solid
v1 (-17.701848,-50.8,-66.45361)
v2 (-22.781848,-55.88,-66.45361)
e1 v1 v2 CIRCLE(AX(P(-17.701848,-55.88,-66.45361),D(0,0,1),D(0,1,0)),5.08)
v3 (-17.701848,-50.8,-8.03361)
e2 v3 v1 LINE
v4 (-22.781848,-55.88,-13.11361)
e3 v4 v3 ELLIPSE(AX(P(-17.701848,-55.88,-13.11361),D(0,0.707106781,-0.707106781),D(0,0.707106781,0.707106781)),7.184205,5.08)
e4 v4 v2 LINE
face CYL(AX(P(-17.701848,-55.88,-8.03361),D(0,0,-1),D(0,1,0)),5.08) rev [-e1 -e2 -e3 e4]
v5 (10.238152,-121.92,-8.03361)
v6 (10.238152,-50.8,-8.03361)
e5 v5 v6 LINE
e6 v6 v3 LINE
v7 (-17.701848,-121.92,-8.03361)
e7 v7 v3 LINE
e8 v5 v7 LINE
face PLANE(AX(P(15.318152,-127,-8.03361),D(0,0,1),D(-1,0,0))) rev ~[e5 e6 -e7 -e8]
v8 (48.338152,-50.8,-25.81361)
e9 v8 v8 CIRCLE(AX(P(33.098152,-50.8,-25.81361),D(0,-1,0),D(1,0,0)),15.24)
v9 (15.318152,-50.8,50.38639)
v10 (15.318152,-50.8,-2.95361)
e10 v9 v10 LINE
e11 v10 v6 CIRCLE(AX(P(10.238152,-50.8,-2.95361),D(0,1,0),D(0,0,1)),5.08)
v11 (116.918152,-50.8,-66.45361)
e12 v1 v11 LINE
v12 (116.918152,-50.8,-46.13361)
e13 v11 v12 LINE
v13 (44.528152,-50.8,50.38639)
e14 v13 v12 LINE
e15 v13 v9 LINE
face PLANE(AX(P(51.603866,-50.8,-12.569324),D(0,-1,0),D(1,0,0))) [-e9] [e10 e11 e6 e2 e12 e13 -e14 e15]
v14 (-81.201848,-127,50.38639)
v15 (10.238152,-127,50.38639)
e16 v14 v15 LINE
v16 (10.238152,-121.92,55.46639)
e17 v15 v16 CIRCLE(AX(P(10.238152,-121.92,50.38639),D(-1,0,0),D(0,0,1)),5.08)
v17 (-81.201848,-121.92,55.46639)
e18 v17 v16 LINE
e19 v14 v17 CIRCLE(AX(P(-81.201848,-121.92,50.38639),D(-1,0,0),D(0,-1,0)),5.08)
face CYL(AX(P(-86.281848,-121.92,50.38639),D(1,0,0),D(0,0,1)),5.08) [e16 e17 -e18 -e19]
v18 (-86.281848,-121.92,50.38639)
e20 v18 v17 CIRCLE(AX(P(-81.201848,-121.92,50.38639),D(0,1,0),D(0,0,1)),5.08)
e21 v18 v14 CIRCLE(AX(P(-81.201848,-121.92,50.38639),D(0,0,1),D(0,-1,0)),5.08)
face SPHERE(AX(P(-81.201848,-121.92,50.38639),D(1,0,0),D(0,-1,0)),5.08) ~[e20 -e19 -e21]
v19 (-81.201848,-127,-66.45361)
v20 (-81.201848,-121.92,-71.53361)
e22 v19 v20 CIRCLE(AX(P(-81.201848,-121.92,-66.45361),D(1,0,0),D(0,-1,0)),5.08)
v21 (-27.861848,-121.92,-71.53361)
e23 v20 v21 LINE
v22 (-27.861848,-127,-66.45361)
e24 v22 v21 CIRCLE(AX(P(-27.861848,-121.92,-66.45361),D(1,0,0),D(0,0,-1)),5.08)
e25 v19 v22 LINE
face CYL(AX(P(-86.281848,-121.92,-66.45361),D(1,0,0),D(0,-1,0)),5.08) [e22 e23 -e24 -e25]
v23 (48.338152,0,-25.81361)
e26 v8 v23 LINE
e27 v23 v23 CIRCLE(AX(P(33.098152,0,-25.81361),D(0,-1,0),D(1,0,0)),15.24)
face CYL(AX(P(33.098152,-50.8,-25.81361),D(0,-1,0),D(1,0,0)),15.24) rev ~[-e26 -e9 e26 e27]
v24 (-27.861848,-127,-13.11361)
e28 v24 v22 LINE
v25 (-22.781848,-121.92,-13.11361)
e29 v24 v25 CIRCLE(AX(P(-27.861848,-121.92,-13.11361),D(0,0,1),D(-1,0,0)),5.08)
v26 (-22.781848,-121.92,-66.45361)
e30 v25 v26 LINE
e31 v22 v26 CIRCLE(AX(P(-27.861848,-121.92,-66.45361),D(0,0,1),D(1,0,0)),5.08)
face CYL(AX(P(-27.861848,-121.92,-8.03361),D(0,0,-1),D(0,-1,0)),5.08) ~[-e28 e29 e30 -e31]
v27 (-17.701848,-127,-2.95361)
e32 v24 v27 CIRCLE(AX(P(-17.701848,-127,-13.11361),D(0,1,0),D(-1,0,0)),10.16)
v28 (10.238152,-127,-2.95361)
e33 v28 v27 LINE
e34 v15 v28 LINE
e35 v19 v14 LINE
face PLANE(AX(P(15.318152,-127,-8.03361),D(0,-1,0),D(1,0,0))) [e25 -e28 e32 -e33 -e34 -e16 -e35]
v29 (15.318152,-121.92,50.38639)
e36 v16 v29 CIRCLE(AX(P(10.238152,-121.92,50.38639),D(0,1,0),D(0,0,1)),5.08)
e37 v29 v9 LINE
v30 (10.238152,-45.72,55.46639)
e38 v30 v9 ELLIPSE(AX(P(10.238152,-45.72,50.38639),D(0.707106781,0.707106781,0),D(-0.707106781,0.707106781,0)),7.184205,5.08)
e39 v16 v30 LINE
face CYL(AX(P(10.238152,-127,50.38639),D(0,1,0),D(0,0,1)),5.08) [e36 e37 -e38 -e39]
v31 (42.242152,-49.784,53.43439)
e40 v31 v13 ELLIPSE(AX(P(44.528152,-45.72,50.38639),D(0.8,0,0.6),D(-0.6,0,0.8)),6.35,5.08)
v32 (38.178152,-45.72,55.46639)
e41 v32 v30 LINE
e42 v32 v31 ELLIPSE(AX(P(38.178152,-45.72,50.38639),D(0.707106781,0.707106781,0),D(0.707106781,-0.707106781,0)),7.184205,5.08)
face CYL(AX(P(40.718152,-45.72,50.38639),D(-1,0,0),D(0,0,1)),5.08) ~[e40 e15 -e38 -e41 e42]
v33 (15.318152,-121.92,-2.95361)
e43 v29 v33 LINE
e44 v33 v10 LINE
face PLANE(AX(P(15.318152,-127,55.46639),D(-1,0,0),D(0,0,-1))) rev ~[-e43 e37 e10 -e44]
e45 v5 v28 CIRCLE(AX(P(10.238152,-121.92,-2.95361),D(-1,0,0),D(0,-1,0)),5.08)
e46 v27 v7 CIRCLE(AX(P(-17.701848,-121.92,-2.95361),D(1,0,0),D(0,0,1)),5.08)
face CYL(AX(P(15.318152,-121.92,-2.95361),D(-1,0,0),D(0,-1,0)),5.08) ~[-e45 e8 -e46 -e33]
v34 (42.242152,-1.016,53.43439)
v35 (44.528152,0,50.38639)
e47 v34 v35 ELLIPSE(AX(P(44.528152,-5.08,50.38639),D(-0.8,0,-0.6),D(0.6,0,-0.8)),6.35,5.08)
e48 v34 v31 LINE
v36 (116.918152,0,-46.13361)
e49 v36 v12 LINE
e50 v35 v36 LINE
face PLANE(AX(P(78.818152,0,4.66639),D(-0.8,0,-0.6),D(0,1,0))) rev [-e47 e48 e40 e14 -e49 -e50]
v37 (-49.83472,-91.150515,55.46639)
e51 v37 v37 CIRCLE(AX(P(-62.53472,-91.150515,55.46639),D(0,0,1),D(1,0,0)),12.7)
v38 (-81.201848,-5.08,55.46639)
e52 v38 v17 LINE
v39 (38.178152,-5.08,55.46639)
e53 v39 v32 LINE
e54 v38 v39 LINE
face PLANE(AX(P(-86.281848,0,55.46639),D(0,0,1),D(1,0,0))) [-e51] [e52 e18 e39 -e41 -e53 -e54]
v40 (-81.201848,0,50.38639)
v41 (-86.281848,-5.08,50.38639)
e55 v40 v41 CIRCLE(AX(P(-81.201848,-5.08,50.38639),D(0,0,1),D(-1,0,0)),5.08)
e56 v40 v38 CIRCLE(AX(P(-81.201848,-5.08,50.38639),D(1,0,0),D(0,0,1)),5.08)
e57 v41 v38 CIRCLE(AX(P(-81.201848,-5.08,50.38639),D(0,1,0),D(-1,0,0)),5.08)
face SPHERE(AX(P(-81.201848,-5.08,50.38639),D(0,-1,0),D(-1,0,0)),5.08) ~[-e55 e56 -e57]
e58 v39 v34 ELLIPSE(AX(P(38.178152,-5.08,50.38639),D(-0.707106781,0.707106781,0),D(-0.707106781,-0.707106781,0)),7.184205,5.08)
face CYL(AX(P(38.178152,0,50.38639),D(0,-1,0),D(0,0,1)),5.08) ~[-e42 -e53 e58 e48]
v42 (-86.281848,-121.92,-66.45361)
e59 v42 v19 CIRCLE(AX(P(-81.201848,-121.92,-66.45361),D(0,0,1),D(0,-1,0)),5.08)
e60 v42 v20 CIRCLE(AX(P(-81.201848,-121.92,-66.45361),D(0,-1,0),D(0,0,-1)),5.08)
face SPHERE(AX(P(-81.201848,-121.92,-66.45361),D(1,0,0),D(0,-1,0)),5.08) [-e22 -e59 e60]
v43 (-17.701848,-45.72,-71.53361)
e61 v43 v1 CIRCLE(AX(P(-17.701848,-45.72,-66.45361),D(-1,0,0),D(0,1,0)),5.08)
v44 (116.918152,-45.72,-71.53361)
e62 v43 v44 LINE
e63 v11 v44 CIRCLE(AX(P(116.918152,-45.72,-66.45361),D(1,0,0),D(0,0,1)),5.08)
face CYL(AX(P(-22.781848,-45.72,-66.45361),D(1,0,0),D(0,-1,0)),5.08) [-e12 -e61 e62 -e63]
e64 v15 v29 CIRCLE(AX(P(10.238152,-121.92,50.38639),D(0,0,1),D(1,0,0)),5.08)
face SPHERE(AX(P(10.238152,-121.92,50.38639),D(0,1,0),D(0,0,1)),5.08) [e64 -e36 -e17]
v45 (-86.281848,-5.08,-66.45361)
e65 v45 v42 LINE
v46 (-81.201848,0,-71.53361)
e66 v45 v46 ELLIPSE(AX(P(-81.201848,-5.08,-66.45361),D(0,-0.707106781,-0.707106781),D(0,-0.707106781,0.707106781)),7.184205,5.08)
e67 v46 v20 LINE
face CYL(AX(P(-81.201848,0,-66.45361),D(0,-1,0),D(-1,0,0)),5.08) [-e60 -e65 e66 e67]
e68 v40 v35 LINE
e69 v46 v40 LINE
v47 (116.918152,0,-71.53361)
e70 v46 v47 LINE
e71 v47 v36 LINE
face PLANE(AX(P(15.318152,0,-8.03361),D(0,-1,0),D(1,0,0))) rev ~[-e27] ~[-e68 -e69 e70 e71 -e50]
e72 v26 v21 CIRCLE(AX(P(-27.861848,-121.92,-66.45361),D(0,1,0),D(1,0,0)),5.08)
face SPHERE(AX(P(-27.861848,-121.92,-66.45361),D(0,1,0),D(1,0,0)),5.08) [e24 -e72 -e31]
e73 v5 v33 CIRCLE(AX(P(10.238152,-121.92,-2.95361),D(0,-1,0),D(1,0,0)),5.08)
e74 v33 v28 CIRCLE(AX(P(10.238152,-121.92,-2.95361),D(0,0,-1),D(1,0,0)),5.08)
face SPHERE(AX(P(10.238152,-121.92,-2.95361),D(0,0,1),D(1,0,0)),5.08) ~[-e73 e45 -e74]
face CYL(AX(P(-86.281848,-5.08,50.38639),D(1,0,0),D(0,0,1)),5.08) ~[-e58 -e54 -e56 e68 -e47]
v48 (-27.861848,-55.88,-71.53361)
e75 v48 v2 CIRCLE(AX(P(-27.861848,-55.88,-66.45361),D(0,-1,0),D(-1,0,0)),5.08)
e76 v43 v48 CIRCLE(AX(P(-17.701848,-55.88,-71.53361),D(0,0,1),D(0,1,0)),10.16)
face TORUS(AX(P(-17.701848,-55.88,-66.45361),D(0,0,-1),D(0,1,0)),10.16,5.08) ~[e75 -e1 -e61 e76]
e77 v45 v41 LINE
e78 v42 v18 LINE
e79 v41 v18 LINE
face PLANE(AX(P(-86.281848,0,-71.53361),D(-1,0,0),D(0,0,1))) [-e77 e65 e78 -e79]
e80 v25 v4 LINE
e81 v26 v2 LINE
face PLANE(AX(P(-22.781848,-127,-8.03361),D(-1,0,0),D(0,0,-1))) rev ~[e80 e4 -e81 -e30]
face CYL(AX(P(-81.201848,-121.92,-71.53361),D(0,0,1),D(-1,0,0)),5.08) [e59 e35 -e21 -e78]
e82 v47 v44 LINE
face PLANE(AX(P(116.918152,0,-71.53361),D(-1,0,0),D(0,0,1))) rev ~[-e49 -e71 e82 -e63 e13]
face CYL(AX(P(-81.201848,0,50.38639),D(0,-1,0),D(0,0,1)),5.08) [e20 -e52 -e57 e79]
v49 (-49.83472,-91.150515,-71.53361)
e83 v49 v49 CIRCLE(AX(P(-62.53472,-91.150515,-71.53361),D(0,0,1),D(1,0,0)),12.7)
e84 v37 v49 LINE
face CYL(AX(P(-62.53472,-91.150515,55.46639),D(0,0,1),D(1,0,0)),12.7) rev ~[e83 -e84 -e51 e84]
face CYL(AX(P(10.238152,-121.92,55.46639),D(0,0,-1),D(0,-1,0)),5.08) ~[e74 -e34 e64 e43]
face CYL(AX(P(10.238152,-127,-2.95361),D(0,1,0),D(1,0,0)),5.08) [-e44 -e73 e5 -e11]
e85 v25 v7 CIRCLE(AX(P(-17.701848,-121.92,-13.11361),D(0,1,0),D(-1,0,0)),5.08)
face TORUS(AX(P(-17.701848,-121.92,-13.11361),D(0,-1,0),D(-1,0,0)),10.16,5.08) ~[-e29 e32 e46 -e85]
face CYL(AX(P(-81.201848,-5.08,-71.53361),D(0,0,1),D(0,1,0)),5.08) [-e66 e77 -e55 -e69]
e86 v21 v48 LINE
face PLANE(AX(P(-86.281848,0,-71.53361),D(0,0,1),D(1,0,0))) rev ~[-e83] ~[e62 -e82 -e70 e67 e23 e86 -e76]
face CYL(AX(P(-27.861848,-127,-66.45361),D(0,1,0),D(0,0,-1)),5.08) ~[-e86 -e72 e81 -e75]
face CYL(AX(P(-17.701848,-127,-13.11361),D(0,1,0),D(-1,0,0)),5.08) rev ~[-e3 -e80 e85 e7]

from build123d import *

# Parameters (mm, degrees)
F0_W     = 203.2
F0_H     = 127
F1_DEPTH = 127
F3_DEPTH = 76.2
F4_SIZE2 = 101.6
F4_SIZE  = 76.2
F5_R     = 5.08
F6_R     = 15.24
F7_DEPTH = 50.8
F8_R     = 12.7
F9_DEPTH = 127


with BuildPart() as f1:
    # F0 (on Front) → F1 (new body)
    with BuildSketch(Plane.XZ):
        with Locations((15.3181515634, -8.0336100439)):
            Rectangle(F0_W, F0_H)
    extrude(amount=F1_DEPTH)

    # F2 (on face) → F3 (cut)
    with BuildSketch(Plane.XZ.offset(127)):
        Polygon((-22.7818484366, -8.0336100439), (-22.7818484366, -71.5336100439), (116.9181515634, -71.5336100439), (116.9181515634, 55.4663899561), (15.3181515634, 55.4663899561), (15.3181515634, 37.2199955379), (15.3181515634, -8.0336100439), align=None)
    extrude(amount=-F3_DEPTH, mode=Mode.SUBTRACT)

    # F4
    f4_edges = [f1.edges().sort_by_distance(p)[0] for p in [
        (116.918152, -25.4, 55.46639),
    ]]
    f4_side = f1.faces().sort_by_distance((-6.453277, -52.614286, 55.46639))[0]
    chamfer(f4_edges, length=F4_SIZE, length2=F4_SIZE2, reference=f4_side)

    # F5
    f5_edges = [f1.edges().sort_by_distance(p)[0] for p in [
        (15.318152, -88.9, 55.46639),
        (-35.481848, -127, 55.46639),
        (15.318152, -127, 23.71639),
        (15.318152, -88.9, -8.03361),
        (-22.781848, -88.9, -8.03361),
        (-22.781848, -88.9, -71.53361),
        (-22.781848, -127, -39.78361),
        (-22.781848, -50.8, -39.78361),
        (-3.731848, -127, -8.03361),
        (-54.531848, -127, -71.53361),
        (-86.281848, -127, -8.03361),
        (-86.281848, -63.5, 55.46639),
        (-86.281848, -63.5, -71.53361),
        (-86.281848, 0, -8.03361),
        (-22.781848, 0, 55.46639),
        (40.718152, -25.4, 55.46639),
        (28.018152, -50.8, 55.46639),
        (47.068152, -50.8, -71.53361),
    ]]
    fillet(f5_edges, radius=F5_R)

    # F6 (on face) → F7 (cut, through all)
    with BuildSketch(Plane.XZ.offset(50.8)):
        with Locations((33.0981515634, -25.8136100439)):
            Circle(F6_R)
    extrude(amount=-F7_DEPTH, mode=Mode.SUBTRACT)

    # F8 (on face) → F9 (cut, through all)
    with BuildSketch(Plane.XY.offset(55.4663899561)):
        with Locations((-62.5347197056, -91.1505147815)):
            Circle(F8_R)
    extrude(amount=-F9_DEPTH, mode=Mode.SUBTRACT)


solid = f1.part
